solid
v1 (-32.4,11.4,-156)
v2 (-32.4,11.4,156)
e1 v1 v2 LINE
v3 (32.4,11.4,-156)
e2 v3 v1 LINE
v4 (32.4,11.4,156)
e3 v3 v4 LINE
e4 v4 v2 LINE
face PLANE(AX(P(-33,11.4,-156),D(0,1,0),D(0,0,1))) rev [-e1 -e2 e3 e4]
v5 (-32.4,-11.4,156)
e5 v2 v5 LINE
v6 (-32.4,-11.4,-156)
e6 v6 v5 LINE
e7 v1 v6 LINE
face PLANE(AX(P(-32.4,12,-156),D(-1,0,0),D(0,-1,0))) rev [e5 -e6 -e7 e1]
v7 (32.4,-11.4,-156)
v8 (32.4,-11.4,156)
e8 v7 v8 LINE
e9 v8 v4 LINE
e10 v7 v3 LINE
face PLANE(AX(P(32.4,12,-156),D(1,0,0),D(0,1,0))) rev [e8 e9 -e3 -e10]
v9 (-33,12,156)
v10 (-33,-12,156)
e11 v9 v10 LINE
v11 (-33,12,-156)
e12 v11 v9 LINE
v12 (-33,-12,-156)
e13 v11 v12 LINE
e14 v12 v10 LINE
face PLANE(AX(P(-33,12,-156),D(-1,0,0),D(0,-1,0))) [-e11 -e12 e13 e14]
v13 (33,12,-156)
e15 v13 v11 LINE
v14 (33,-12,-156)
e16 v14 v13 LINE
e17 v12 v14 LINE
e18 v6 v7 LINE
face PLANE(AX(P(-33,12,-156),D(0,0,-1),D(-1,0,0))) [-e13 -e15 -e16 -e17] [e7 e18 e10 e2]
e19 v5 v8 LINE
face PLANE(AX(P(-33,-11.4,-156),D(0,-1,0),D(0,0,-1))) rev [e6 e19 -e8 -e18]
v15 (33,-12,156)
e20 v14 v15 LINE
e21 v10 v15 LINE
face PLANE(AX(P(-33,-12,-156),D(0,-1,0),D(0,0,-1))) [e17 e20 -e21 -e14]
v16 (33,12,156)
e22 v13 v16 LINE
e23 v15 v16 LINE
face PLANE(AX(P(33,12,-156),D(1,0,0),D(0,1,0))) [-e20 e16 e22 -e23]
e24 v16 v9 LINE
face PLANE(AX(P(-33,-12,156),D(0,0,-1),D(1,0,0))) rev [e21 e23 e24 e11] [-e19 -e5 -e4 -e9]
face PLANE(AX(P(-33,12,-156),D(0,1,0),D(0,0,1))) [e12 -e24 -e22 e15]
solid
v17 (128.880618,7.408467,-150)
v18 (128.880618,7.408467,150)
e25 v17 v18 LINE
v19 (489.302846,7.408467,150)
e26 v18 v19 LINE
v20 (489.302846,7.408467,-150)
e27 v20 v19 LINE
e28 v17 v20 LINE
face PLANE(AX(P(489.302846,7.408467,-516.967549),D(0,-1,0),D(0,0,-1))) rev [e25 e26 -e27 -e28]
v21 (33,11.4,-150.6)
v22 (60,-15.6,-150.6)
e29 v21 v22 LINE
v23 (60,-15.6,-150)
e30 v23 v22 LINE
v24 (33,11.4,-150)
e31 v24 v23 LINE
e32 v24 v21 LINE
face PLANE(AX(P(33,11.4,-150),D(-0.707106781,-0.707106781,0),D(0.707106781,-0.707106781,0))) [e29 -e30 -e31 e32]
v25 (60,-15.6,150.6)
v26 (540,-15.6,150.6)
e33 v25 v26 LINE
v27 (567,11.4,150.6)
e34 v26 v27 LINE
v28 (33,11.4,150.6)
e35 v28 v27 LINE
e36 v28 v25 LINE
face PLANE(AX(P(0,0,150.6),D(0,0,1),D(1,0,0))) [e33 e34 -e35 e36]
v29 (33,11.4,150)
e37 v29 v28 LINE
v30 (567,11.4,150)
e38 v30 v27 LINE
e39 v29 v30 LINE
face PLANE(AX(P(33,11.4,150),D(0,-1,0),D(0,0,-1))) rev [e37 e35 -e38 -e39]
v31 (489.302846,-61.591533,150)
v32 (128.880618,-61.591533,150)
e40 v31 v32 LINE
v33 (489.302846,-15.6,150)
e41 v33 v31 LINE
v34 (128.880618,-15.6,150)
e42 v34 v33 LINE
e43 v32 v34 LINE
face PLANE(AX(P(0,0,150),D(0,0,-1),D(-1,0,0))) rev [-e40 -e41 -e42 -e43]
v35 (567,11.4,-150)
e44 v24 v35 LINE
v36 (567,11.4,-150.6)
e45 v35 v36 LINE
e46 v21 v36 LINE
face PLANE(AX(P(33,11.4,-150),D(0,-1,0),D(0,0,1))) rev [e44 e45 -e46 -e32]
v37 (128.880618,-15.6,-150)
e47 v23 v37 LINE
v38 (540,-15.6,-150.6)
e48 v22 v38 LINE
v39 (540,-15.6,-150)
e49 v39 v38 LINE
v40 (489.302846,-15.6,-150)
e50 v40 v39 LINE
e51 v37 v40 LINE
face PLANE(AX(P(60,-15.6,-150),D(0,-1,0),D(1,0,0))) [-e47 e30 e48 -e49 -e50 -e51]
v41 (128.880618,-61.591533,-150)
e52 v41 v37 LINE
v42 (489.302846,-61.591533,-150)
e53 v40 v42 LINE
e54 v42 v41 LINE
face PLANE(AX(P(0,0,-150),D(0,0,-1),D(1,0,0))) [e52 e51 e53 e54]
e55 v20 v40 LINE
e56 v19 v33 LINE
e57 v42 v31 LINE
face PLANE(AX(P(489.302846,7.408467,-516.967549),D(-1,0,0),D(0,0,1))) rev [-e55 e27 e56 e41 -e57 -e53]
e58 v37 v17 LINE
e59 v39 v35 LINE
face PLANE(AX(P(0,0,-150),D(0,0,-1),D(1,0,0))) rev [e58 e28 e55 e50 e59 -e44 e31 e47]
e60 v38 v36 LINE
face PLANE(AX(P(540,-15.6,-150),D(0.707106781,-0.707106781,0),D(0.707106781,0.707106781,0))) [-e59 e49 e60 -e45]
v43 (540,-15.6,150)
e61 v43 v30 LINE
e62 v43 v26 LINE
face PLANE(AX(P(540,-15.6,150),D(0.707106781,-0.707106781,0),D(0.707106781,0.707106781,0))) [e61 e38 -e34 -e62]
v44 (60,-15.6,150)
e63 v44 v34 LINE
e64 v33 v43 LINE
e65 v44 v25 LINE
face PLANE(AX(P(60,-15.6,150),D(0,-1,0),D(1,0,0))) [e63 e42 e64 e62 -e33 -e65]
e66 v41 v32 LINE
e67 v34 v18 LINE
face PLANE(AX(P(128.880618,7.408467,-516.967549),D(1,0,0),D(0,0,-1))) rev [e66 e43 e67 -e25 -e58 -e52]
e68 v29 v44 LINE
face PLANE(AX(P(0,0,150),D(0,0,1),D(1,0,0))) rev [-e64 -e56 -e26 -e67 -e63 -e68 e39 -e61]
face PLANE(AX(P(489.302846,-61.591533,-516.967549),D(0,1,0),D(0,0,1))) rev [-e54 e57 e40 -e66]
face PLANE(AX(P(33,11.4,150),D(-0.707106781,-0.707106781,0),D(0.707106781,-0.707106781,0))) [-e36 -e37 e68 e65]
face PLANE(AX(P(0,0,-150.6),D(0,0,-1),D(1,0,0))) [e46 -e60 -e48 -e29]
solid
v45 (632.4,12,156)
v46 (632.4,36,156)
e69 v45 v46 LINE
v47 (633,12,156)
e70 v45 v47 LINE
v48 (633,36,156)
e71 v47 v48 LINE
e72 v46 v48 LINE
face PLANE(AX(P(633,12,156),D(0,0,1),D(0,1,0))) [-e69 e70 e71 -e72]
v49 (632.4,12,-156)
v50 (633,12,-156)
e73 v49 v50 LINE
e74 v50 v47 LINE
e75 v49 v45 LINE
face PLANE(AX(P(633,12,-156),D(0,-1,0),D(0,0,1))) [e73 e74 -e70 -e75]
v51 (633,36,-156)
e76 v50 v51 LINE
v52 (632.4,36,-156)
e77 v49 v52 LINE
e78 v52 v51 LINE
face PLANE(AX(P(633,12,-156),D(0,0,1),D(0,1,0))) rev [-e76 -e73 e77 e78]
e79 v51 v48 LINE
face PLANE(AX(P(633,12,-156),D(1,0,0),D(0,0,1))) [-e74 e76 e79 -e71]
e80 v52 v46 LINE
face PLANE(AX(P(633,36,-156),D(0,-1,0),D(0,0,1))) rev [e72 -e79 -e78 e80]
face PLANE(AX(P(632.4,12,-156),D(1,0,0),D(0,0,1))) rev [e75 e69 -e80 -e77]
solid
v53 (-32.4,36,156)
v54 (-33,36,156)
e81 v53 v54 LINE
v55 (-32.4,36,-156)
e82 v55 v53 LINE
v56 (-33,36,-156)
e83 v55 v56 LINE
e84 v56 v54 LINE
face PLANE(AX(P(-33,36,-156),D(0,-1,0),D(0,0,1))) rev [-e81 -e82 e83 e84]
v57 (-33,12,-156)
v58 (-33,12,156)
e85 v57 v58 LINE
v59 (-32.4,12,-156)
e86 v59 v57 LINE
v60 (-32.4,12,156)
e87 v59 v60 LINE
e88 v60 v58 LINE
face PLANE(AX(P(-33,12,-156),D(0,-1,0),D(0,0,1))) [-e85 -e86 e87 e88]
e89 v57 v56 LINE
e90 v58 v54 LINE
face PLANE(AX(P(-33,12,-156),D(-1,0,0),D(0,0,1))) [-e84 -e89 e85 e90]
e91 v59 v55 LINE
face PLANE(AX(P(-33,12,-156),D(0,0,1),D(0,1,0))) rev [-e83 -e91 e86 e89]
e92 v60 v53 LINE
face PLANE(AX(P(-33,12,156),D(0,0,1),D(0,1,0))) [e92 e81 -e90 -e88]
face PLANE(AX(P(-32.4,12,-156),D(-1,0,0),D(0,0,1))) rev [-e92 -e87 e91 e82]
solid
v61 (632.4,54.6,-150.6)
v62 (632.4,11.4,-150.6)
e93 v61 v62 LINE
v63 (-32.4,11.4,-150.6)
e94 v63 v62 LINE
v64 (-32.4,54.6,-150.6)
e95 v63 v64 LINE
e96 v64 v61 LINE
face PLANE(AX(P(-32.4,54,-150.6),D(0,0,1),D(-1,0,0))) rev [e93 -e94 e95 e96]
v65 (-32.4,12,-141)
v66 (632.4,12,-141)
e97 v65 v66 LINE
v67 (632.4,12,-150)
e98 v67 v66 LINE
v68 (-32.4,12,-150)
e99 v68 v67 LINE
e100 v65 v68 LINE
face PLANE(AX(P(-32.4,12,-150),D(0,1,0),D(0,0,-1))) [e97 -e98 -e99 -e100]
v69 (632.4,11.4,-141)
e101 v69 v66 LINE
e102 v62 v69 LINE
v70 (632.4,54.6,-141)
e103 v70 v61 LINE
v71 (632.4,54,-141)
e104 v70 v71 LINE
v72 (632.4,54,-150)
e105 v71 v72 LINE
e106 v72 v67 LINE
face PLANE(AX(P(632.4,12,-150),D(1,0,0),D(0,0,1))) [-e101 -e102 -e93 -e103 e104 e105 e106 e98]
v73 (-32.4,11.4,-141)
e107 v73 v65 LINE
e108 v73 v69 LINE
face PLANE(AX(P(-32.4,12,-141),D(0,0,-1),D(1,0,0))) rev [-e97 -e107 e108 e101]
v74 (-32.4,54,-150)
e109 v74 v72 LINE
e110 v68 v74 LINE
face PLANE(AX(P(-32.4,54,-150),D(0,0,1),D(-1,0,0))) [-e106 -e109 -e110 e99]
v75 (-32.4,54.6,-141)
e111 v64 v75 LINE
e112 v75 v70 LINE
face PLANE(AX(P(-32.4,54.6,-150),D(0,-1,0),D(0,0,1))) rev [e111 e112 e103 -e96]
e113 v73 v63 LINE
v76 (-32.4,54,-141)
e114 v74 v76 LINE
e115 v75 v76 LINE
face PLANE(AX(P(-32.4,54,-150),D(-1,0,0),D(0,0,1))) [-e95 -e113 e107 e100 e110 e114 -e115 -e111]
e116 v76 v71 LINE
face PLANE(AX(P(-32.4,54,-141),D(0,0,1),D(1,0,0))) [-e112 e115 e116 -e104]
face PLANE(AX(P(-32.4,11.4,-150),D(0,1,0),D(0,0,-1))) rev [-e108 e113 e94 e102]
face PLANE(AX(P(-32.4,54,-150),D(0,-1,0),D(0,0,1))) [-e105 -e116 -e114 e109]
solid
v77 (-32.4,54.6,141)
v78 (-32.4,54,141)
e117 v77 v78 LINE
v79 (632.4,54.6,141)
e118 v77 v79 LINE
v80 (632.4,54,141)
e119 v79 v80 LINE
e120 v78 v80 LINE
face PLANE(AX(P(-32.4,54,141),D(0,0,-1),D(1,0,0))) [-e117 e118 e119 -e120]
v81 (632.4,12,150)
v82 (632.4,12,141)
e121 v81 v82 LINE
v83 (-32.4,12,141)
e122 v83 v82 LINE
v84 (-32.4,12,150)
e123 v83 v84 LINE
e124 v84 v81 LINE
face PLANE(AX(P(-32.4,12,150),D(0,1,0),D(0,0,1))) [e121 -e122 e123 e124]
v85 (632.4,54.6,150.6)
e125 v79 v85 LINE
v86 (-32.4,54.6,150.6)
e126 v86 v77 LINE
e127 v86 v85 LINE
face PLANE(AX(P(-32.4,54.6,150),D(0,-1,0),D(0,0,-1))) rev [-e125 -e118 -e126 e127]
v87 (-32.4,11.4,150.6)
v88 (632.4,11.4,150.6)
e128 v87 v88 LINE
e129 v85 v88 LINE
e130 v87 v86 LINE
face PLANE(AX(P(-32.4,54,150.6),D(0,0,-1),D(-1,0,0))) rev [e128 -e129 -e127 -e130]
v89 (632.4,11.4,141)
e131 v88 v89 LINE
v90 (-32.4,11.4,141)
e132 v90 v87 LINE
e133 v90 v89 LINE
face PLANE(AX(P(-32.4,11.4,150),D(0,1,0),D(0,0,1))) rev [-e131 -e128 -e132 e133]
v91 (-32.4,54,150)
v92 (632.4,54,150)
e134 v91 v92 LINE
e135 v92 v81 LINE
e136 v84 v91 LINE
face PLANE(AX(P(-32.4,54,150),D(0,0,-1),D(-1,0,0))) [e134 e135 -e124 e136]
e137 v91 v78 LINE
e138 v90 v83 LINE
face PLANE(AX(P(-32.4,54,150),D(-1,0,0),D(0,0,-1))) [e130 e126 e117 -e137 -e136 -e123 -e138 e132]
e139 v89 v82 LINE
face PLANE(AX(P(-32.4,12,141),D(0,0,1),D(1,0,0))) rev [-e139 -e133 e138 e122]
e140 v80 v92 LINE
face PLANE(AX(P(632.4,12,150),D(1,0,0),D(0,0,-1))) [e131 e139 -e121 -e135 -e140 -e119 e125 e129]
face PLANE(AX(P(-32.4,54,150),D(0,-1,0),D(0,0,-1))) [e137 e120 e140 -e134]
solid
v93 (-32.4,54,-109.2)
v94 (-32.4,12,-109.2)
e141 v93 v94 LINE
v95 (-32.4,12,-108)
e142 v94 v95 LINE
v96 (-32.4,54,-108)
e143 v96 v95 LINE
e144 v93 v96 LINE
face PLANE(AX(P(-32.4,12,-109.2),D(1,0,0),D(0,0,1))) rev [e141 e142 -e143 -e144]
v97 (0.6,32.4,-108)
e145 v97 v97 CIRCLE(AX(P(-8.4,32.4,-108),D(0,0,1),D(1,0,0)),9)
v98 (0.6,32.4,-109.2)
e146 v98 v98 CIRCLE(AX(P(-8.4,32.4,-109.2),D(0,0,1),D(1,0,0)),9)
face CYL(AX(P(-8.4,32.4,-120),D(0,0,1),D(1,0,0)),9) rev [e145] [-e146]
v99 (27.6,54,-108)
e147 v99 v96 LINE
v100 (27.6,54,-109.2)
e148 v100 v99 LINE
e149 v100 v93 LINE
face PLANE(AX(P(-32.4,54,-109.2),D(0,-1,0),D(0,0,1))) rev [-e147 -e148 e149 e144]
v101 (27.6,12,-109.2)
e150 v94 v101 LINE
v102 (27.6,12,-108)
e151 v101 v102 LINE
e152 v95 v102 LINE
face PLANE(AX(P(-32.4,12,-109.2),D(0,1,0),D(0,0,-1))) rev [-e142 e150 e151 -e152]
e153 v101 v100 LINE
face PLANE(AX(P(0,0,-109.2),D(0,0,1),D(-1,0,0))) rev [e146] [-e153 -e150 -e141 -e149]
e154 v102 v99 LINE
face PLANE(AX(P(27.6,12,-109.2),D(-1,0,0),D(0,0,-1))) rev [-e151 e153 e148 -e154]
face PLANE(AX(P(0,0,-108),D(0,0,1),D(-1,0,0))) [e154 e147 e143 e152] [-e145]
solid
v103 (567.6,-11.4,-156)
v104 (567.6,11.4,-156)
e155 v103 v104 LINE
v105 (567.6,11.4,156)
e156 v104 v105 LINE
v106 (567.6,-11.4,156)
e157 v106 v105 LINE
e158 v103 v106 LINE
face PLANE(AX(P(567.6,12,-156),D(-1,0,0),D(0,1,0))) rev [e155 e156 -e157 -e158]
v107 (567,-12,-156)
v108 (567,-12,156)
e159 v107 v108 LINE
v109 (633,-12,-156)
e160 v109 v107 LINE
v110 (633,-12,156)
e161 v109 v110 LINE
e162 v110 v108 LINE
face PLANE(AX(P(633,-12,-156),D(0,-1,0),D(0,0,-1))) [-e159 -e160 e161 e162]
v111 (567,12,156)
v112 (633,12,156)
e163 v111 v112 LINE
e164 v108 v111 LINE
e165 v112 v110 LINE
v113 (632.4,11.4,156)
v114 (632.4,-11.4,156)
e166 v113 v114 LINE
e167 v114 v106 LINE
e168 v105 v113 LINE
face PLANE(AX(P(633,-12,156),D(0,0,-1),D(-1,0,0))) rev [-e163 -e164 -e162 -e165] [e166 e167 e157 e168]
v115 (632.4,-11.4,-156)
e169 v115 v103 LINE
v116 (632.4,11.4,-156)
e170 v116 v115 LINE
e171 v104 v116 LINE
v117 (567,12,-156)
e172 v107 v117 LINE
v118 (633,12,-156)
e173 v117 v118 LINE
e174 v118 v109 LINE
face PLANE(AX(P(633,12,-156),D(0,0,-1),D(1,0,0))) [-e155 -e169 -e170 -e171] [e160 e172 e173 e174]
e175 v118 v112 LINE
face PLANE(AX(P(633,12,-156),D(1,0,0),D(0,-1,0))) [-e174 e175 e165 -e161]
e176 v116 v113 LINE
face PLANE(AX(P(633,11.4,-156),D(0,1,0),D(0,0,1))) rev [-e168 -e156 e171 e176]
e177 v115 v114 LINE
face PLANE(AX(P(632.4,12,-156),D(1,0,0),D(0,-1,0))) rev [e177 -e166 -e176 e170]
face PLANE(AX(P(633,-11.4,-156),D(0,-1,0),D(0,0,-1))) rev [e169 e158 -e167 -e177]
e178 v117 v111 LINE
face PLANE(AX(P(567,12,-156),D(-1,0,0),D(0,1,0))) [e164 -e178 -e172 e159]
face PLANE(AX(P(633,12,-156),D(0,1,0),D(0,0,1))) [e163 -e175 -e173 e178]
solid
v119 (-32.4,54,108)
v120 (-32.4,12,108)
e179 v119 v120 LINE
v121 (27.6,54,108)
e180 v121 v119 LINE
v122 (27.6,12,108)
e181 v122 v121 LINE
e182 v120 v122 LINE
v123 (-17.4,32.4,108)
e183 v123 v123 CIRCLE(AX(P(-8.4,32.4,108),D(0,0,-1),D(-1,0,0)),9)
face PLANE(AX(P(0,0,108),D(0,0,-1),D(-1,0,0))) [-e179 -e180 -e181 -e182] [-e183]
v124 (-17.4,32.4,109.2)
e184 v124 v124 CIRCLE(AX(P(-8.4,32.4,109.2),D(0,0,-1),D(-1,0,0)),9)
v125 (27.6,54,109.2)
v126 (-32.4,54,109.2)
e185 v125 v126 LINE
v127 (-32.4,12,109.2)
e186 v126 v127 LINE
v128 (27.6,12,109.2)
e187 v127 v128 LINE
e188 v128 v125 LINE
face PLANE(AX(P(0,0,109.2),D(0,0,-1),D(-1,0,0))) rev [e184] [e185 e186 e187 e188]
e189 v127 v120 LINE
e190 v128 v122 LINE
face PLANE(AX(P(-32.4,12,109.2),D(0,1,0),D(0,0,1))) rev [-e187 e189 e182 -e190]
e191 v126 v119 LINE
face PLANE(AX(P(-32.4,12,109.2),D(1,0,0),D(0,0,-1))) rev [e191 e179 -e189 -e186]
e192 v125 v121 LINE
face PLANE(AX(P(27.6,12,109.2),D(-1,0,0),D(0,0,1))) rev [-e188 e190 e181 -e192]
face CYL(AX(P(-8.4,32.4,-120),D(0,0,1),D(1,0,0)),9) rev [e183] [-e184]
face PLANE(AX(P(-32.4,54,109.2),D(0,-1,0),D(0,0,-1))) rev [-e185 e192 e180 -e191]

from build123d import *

# Parameters (mm, degrees)
SHEET_EXTRUDE_1_1_BACK  = 260
SHEET_EXTRUDE_1_1_DEPTH = 520
THICKEN_1_T2            = 1
THICKEN_START           = 20
THICKEN_2_OUTLINE_W     = 1
THICKEN_2_OUTLINE_H     = 520
THICKEN_2_DEPTH         = 40
THICKEN_START_2         = -54
THICKEN_3_DEPTH         = 1108
EXTRUDE_1_DEPTH         = 1
SKETCH_5_W              = 100
SKETCH_5_H              = 70
EXTRUDE_2_DEPTH         = 2
SKETCH_6_R              = 15
CUT_EXTRUDE_1_DEPTH     = 200
SKETCH_7_W              = 600.703712977
SKETCH_7_H              = 115
EXTRUDE_3_DEPTH         = 500
SCALE_1_SCALE           = 0.6


# Read off the part's stored shape, not the designer's step: 加厚2, 加厚3
with BuildPart() as body_1:
    # Sheet 凸台-拉伸1: a surface, the sketch's curves swept straight by 520 mm
    with BuildLine(Plane.XY.offset(-SHEET_EXTRUDE_1_1_BACK), mode=Mode.PRIVATE) as sheet_extrude_1_1_path:
        Line((-55, 20), (55, 20))
        Line((55, 20), (55, -20))
        Line((55, -20), (-55, -20))
        Line((-55, -20), (-55, 20))
    sheet_extrude_1_1 = Shell.extrude(sheet_extrude_1_1_path.wire(), (0 * SHEET_EXTRUDE_1_1_DEPTH, 0 * SHEET_EXTRUDE_1_1_DEPTH, 1 * SHEET_EXTRUDE_1_1_DEPTH))
    add(Solid.thicken(sheet_extrude_1_1, -THICKEN_1_T2))


with BuildPart() as body_2:
    # 加厚2 outline → 加厚2 (new body)
    with BuildSketch(Plane(origin=(0, 0, 0), x_dir=(1, 0, 0), z_dir=(0, 1, 0)).offset(THICKEN_START)):
        with Locations((-54.5, 0)):
            Rectangle(THICKEN_2_OUTLINE_W, THICKEN_2_OUTLINE_H)
    extrude(amount=THICKEN_2_DEPTH)


with BuildPart() as body_3:
    # 镜向2: mirrored copy
    add(body_1.part.mirror(Plane(origin=(500, 0, 0), x_dir=(0, 0, 1), z_dir=(1, 0, 0))))


with BuildPart() as body_4:
    # Mirror 2 2: mirrored copy
    add(body_2.part.mirror(Plane(origin=(500, 0, 0), x_dir=(0, 0, 1), z_dir=(1, 0, 0))))


with BuildPart() as body_5:
    # 加厚3 outline → 加厚3 (new body)
    with BuildSketch(Plane.YZ.offset(THICKEN_START_2)):
        Polygon((19, 235), (20, 235), (20, 250), (90, 250), (90, 235), (91, 235), (91, 251), (19, 251), align=None)
    extrude(amount=THICKEN_3_DEPTH)


with BuildPart() as body_6:
    # 镜向3: mirrored copy
    add(body_5.part.mirror(Plane.XY))


with BuildPart() as body_7:
    # 草图4 → 凸台-拉伸1 (new body)
    with BuildSketch(Plane.XY.offset(251)):
        Polygon((55, 19), (100, -26), (900, -26), (945, 19), align=None)
    extrude(amount=-EXTRUDE_1_DEPTH)


with BuildPart() as body_8:
    # 镜向4: mirrored copy
    add(body_7.part.mirror(Plane.XY))


with BuildPart() as body_9:
    # 草图5 → 凸台-拉伸2 (new body)
    with BuildSketch(Plane.XY.offset(180)):
        with Locations((-4, 55)):
            Rectangle(SKETCH_5_W, SKETCH_5_H)
    extrude(amount=EXTRUDE_2_DEPTH)


with BuildPart() as body_10:
    # 镜向5: mirrored copy
    add(body_9.part.mirror(Plane.XY))


with BuildPart() as cut_extrude_1_tool:
    # 草图6 → 切除-拉伸1 (new, symmetric)
    with BuildSketch(Plane.XY):
        with Locations((-14, 54)):
            Circle(SKETCH_6_R)
    extrude(amount=CUT_EXTRUDE_1_DEPTH, both=True)


with BuildPart() as body_9_1:
    add(body_9.part)

    # 切除-拉伸1: cut by cut_extrude_1_tool
    add(cut_extrude_1_tool.part, mode=Mode.SUBTRACT)


with BuildPart() as body_10_1:
    add(body_10.part)

    # 切除-拉伸1: cut by cut_extrude_1_tool
    add(cut_extrude_1_tool.part, mode=Mode.SUBTRACT)


with BuildPart() as body_7_1:
    add(body_7.part)

    add(body_8.part)  # 凸台-拉伸3 merges body 8
    # 草图7 → 凸台-拉伸3 (add)
    with BuildSketch(Plane(origin=(0, 0, 250), x_dir=(-1, 0, 0), z_dir=(0, 0, -1))):
        with Locations((-515.152886454, -45.152554207)):
            Rectangle(SKETCH_7_W, SKETCH_7_H)
    extrude(amount=EXTRUDE_3_DEPTH)


with BuildPart() as body_1_1:
    # 缩放比例1: scaled about (0, 0, 0)
    add(body_1.part.scale(SCALE_1_SCALE))


with BuildPart() as body_7_2:
    # 缩放比例1: scaled about (0, 0, 0)
    add(body_7_1.part.scale(SCALE_1_SCALE))


with BuildPart() as body_4_1:
    # 缩放比例1: scaled about (0, 0, 0)
    add(body_4.part.scale(SCALE_1_SCALE))


with BuildPart() as body_5_1:
    # 缩放比例1: scaled about (0, 0, 0)
    add(body_5.part.scale(SCALE_1_SCALE))


with BuildPart() as body_9_2:
    # 缩放比例1: scaled about (0, 0, 0)
    add(body_9_1.part.scale(SCALE_1_SCALE))


with BuildPart() as body_6_1:
    # 缩放比例1: scaled about (0, 0, 0)
    add(body_6.part.scale(SCALE_1_SCALE))


with BuildPart() as body_3_1:
    # 缩放比例1: scaled about (0, 0, 0)
    add(body_3.part.scale(SCALE_1_SCALE))


with BuildPart() as body_10_2:
    # 缩放比例1: scaled about (0, 0, 0)
    add(body_10_1.part.scale(SCALE_1_SCALE))


with BuildPart() as body_2_1:
    # 缩放比例1: scaled about (0, 0, 0)
    add(body_2.part.scale(SCALE_1_SCALE))


solid = Compound([body_1_1.part, body_7_2.part, body_4_1.part, body_5_1.part, body_9_2.part, body_6_1.part, body_3_1.part, body_10_2.part, body_2_1.part])
